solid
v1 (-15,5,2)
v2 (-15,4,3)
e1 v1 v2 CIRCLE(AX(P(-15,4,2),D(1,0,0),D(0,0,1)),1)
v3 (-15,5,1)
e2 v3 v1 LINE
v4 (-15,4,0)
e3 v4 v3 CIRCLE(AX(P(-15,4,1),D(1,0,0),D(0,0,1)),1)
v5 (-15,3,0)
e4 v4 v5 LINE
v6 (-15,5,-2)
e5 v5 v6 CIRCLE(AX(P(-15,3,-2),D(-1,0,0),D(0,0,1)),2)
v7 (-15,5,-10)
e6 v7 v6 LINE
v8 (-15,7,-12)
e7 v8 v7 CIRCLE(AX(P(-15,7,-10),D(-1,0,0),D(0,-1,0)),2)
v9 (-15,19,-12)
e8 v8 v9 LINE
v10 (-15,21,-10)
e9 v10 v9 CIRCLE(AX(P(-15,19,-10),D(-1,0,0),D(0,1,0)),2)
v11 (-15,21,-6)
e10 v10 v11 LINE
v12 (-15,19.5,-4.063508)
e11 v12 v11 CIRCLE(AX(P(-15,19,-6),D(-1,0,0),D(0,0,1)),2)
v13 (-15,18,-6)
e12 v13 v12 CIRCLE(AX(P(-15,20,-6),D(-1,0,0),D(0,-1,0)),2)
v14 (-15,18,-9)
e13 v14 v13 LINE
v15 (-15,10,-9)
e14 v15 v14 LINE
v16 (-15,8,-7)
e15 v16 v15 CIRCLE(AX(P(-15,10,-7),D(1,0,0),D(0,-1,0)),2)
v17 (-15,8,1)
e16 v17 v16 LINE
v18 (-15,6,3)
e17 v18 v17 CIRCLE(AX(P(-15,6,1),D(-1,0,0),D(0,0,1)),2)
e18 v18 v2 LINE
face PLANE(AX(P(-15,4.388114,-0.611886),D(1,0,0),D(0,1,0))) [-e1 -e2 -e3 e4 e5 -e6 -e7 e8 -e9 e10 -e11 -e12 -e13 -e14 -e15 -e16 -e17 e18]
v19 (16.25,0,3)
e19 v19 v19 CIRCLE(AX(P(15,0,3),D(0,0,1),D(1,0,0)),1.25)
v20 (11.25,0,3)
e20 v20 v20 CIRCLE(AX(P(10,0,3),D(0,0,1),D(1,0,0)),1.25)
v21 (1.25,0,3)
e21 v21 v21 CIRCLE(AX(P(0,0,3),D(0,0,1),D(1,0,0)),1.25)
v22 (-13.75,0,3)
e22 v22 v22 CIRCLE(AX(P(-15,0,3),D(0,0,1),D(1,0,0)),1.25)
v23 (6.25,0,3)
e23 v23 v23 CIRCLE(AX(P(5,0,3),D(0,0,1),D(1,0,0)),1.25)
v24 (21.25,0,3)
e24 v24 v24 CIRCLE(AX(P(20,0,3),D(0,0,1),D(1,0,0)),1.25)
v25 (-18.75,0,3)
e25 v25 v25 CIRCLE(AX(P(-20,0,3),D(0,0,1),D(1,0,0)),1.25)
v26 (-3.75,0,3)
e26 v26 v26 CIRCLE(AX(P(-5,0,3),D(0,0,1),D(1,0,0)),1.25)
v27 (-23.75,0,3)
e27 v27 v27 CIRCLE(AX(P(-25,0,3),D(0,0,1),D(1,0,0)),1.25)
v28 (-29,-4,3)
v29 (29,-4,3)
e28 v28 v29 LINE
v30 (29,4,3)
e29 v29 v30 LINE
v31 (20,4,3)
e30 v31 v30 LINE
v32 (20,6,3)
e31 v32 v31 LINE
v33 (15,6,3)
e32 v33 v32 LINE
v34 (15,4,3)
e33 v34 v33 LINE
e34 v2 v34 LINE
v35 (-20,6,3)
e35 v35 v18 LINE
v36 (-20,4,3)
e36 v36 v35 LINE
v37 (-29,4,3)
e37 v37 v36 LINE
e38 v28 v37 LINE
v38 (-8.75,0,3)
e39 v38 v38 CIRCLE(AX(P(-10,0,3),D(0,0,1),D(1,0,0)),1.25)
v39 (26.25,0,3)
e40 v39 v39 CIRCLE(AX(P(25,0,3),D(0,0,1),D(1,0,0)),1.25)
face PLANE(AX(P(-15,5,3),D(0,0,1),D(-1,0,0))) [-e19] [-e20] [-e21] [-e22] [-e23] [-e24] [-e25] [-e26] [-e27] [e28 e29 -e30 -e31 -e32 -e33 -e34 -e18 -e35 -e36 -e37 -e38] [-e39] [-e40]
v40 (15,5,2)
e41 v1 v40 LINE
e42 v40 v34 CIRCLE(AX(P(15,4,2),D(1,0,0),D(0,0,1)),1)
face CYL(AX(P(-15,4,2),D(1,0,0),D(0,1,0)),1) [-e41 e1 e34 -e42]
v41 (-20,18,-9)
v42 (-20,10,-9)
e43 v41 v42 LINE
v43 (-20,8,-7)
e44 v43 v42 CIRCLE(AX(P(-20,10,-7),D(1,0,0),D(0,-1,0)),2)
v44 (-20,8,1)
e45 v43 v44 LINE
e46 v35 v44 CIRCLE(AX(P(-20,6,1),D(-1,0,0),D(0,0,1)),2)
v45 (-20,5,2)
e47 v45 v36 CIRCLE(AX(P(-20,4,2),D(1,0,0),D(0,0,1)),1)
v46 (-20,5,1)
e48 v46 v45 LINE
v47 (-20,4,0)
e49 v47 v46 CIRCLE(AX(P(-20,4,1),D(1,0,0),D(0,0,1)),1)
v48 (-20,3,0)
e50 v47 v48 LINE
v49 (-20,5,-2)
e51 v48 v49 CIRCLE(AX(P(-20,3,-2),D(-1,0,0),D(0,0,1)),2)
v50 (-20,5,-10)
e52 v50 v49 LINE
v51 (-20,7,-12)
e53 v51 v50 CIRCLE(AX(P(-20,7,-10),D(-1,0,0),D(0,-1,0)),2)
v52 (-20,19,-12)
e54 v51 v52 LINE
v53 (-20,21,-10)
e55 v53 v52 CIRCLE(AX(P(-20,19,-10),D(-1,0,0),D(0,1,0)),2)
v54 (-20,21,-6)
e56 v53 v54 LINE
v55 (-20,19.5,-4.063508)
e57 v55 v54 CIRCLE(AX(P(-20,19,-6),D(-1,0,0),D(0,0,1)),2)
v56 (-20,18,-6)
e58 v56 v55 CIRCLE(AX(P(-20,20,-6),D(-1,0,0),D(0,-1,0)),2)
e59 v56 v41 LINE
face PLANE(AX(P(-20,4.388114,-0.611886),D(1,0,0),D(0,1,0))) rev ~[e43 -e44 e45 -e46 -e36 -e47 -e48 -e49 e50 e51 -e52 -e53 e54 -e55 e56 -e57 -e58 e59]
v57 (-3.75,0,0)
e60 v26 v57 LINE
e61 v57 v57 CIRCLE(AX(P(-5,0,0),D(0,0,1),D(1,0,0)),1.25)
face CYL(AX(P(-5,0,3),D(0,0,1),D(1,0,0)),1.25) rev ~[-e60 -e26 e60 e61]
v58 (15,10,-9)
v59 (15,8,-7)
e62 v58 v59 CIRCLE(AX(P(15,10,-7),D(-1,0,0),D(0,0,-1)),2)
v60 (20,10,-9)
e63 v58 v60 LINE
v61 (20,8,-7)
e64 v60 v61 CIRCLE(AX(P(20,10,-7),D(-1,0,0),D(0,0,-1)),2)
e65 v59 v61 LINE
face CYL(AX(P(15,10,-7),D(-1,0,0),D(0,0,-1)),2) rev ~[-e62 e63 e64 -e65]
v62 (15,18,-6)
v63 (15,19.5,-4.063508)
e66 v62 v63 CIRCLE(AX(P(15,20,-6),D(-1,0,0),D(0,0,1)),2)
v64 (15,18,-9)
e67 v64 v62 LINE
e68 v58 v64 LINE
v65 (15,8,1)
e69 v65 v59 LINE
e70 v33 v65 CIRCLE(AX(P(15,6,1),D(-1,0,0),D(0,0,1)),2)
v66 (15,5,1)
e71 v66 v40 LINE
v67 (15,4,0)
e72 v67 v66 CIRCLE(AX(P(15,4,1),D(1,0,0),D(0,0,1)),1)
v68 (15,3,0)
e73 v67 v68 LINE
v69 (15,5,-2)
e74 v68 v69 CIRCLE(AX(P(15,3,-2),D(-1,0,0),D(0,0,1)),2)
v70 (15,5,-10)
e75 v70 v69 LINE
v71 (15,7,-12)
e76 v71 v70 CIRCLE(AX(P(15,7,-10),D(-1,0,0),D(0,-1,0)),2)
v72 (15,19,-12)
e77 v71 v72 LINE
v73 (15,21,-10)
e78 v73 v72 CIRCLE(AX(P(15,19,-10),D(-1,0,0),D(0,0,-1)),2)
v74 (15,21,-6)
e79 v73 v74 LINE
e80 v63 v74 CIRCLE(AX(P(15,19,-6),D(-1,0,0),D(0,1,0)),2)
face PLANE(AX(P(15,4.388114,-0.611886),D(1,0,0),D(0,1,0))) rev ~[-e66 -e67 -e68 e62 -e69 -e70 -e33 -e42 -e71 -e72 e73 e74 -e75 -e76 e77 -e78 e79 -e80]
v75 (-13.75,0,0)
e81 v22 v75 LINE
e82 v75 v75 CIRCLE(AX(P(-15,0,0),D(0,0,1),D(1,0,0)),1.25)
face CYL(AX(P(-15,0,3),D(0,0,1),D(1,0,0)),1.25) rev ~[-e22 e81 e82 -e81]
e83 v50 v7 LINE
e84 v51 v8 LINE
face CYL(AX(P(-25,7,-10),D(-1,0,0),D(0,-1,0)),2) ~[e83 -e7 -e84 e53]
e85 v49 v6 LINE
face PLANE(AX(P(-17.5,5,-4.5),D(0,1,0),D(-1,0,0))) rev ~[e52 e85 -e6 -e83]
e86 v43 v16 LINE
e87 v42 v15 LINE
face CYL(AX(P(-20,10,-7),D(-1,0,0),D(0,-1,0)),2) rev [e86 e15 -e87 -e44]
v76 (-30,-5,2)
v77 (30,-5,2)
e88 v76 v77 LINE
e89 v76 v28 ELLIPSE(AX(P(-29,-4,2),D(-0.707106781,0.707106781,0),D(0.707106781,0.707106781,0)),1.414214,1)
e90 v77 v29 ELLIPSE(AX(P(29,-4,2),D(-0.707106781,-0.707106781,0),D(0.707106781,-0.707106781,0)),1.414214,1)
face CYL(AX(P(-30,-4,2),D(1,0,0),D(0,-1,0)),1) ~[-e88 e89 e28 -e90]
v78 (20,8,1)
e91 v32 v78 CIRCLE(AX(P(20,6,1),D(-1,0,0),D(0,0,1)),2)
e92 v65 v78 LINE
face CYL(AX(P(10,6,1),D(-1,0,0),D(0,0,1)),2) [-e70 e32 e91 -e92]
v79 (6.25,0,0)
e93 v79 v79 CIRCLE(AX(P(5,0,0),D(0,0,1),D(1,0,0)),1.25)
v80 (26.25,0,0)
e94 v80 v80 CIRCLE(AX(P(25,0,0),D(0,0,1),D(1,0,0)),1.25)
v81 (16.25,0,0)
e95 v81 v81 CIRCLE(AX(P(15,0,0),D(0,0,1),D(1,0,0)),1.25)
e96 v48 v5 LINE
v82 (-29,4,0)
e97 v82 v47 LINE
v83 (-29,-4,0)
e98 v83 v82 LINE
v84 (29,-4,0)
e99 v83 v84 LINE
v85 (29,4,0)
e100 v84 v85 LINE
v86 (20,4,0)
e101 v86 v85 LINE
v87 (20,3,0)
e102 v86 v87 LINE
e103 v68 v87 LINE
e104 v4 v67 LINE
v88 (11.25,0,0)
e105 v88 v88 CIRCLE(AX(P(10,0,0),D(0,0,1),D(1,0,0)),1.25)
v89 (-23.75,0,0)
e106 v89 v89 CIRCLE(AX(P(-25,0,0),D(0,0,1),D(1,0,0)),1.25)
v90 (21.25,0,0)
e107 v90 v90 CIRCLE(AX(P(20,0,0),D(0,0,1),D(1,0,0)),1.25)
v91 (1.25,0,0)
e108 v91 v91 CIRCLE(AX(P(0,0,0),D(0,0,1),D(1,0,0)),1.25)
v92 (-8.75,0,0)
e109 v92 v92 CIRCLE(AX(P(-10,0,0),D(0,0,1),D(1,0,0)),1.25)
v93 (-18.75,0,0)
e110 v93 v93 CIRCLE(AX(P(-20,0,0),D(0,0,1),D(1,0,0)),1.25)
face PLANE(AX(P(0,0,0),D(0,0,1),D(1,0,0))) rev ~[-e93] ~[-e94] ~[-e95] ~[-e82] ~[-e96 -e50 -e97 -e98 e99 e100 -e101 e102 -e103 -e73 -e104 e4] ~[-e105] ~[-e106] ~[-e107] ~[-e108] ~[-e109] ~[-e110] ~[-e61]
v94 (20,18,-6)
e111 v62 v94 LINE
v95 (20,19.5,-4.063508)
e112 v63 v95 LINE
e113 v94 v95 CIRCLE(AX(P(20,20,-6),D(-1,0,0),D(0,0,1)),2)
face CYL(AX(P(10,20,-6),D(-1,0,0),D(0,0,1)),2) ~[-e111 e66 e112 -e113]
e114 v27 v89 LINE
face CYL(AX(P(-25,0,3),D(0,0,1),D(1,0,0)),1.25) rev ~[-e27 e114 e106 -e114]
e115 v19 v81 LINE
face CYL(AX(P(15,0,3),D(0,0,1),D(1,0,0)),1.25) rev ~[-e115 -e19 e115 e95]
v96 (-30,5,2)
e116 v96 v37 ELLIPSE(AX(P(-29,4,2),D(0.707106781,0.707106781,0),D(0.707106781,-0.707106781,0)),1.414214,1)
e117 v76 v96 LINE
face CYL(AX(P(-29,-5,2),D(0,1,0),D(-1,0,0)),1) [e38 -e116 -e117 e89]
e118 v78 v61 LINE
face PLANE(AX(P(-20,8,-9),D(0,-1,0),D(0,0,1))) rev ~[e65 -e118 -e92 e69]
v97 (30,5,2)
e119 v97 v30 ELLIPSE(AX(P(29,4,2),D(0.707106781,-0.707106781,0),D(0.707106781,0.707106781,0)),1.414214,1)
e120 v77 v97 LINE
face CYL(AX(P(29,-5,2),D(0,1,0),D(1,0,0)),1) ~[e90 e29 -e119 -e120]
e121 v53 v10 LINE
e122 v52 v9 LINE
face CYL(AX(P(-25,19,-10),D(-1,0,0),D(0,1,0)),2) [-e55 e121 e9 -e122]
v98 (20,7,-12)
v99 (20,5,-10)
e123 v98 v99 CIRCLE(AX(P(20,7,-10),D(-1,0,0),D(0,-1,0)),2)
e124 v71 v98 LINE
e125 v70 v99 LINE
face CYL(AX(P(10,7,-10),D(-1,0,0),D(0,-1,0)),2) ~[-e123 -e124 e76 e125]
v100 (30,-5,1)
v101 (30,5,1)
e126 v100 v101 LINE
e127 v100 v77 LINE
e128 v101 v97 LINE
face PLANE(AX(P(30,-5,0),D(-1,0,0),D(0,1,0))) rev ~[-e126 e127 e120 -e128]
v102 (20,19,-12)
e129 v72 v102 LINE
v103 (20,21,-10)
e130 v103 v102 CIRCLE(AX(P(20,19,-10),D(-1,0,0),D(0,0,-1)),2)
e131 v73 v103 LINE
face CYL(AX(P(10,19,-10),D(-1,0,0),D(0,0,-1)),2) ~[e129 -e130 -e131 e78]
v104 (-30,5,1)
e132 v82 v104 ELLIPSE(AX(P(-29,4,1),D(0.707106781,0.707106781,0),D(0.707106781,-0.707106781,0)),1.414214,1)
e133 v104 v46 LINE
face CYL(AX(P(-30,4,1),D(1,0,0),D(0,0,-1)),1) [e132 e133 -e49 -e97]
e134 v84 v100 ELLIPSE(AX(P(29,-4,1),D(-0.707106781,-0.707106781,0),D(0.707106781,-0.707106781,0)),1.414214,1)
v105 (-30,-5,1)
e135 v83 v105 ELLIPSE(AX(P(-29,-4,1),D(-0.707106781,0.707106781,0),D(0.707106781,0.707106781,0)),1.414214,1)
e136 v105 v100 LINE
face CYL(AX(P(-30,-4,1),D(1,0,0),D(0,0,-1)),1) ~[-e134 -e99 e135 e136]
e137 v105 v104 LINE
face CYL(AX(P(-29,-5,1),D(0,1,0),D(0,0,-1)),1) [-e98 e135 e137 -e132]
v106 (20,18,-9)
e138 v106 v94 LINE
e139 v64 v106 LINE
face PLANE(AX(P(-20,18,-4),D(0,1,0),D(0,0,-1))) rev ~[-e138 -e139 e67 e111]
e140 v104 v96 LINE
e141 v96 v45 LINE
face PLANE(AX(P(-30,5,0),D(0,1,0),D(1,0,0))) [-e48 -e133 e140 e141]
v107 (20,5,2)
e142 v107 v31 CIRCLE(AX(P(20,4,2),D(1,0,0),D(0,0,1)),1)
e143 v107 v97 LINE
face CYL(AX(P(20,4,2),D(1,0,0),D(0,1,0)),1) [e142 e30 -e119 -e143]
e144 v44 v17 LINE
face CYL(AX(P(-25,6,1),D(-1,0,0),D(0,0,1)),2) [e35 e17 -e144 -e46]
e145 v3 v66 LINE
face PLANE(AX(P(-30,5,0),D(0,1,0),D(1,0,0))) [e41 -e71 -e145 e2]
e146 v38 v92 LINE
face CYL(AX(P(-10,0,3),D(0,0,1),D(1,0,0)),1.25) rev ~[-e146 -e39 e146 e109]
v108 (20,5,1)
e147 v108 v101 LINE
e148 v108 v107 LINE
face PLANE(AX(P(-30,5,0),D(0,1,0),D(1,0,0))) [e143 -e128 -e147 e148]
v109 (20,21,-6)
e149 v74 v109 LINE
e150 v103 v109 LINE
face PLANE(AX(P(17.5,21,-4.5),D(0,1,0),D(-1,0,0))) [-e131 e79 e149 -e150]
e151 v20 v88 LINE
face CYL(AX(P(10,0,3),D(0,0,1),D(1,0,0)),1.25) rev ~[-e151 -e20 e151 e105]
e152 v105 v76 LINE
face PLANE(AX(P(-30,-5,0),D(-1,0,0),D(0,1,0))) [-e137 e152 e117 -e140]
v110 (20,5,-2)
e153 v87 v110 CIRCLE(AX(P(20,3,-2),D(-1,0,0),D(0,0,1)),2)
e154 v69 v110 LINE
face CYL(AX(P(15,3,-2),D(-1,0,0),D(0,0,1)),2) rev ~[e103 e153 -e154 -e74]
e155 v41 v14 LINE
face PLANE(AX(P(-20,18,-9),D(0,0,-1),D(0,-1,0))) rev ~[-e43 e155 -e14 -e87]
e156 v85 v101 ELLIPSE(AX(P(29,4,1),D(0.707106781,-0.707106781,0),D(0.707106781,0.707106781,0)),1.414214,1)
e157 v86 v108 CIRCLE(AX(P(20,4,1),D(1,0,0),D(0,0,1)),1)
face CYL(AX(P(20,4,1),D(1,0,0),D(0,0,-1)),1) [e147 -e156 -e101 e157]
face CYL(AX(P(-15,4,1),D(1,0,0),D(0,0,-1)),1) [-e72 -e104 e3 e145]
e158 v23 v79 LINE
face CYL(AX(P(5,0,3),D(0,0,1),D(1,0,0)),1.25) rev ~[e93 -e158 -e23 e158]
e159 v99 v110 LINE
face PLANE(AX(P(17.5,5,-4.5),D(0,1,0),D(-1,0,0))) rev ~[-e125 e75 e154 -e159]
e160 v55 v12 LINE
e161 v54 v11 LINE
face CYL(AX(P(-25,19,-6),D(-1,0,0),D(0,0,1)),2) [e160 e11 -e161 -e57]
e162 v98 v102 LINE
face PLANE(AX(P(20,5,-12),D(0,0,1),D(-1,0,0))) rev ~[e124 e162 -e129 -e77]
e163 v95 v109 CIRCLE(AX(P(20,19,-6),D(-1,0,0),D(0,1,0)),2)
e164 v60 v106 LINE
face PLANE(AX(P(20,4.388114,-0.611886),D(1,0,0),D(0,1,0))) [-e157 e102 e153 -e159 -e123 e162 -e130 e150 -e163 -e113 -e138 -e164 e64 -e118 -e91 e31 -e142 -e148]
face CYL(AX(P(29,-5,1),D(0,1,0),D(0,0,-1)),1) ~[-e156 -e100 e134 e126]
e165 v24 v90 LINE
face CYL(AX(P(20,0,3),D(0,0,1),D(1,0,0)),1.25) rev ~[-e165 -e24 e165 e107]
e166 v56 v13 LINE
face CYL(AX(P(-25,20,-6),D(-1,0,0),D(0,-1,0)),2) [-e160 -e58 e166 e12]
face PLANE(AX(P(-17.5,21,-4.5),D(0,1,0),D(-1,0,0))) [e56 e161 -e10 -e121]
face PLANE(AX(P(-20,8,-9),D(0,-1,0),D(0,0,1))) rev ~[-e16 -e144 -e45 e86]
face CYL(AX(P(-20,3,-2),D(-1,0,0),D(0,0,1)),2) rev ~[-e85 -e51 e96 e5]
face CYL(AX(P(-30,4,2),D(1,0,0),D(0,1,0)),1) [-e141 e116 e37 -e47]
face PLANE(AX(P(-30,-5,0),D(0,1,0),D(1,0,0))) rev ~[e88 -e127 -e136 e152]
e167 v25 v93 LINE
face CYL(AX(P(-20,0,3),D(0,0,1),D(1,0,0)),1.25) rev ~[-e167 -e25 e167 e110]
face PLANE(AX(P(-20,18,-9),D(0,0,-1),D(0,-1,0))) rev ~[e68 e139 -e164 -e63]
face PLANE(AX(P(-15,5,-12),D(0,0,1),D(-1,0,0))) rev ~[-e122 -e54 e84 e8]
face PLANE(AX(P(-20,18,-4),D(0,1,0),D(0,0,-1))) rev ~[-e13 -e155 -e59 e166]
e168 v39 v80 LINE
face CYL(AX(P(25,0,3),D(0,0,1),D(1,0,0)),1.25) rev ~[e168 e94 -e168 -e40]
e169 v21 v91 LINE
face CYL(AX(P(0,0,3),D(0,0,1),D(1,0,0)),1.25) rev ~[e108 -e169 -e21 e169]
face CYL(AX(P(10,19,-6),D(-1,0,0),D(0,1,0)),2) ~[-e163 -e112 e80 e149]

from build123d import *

# Parameters (mm, degrees)
F0_W        = 60
F0_H        = 10
F1_DEPTH    = 3
F2_R        = 1.25
F3_DEPTH    = 3
F4_W        = 5
F4_H        = 15
F5_DEPTH    = 16
F7_DEPTH    = 60
F8_T1_DEPTH = 5
F8_T3_DEPTH = 5
F8_T5_DEPTH = 15
F8_T7_DEPTH = 15
F9_R        = 1


# Not quite as in the source:
# - a fillet or chamfer that OpenCascade refuses, or shapes differently, is made with other operations: its cross-section is extruded or revolved along the edge and cut away or added


with BuildPart() as f1:
    # F0 (on Top) → F1 (new body)
    with BuildSketch(Plane.XY):
        Rectangle(F0_W, F0_H)
    extrude(amount=F1_DEPTH)

    # F2 (on face) → F3 (cut)
    with BuildSketch(Plane.XY.offset(3)):
        with Locations((-25, 0)):
            Circle(F2_R)
        with Locations((-20, 0)):
            Circle(F2_R)
        with Locations((-15, 0)):
            Circle(F2_R)
        with Locations((-10, 0)):
            Circle(F2_R)
        with Locations((-5, 0)):
            Circle(F2_R)
        Circle(F2_R)
        with Locations((5, 0)):
            Circle(F2_R)
        with Locations((10, 0)):
            Circle(F2_R)
        with Locations((15, 0)):
            Circle(F2_R)
        with Locations((20, 0)):
            Circle(F2_R)
        with Locations((25, 0)):
            Circle(F2_R)
    extrude(amount=-F3_DEPTH, mode=Mode.SUBTRACT)

    # F4 (on face) → F5 (join)
    with BuildSketch(Plane(origin=(0, 5, 0), x_dir=(-1, 0, 0), z_dir=(0, 1, 0))):
        with Locations((17.5, -4.5)):
            Rectangle(F4_W, F4_H)
        with Locations((-17.5, -4.5)):
            Rectangle(F4_W, F4_H)
    extrude(amount=F5_DEPTH)

    # F6 (on face) → F7 (cut)
    with BuildSketch(Plane(origin=(-20, 0, 0), x_dir=(0, -1, 0), z_dir=(-1, 0, 0))):
        Polygon((-8, -9), (-8, 3), (-21, 3), (-21, -4), (-18, -4), (-18, -9), align=None)
    extrude(amount=-F7_DEPTH, mode=Mode.SUBTRACT)

    # F8: fillet of radius 2 on 17 edges, made by hand

    # F8_s2 → F8_t1 (join)
    with BuildSketch(Plane.YZ.offset(15)):
        with BuildLine():
            ThreePointArc((3, 0), (4.4142135624, -0.5857864376), (5, -2))
            Line((5, -2), (5, 0))
            Line((5, 0), (3, 0))
        make_face()
        with BuildLine():
            ThreePointArc((10, -9), (8.5857864376, -8.4142135624), (8, -7))
            Line((8, -7), (8, -9))
            Line((8, -9), (10, -9))
        make_face()
    extrude(amount=F8_T1_DEPTH)

    # F8_s4 → F8_t3 (join)
    with BuildSketch(Plane.YZ.offset(-20)):
        with BuildLine():
            ThreePointArc((3, 0), (4.4142135624, -0.5857864376), (5, -2))
            Line((5, -2), (5, 0))
            Line((5, 0), (3, 0))
        make_face()
        with BuildLine():
            ThreePointArc((8, -7), (8.5857864376, -8.4142135624), (10, -9))
            Line((10, -9), (8, -9))
            Line((8, -9), (8, -7))
        make_face()
    extrude(amount=F8_T3_DEPTH)

    # F8_s6 → F8_t5 (cut)
    with BuildSketch(Plane.YZ.offset(-25)):
        with BuildLine():
            ThreePointArc((5, -10), (5.5857864376, -11.4142135624), (7, -12))
            Line((7, -12), (5, -12))
            Line((5, -12), (5, -10))
        make_face()
        with BuildLine():
            ThreePointArc((21, -10), (20.4142135624, -11.4142135624), (19, -12))
            Line((19, -12), (21, -12))
            Line((21, -12), (21, -10))
        make_face()
        with BuildLine():
            ThreePointArc((19, -4), (20.4142135624, -4.5857864376), (21, -6))
            Line((21, -6), (21, -4))
            Line((21, -4), (19, -4))
        make_face()
        with BuildLine():
            ThreePointArc((18, -6), (18.5857864376, -4.5857864376), (20, -4))
            Line((20, -4), (18, -4))
            Line((18, -4), (18, -6))
        make_face()
        with BuildLine():
            ThreePointArc((6, 3), (7.4142135624, 2.4142135624), (8, 1))
            Line((8, 1), (8, 3))
            Line((8, 3), (6, 3))
        make_face()
    extrude(amount=F8_T5_DEPTH, mode=Mode.SUBTRACT)

    # F8_s8 → F8_t7 (cut)
    with BuildSketch(Plane.YZ.offset(10)):
        with BuildLine():
            ThreePointArc((5, -10), (5.5857864376, -11.4142135624), (7, -12))
            Line((7, -12), (5, -12))
            Line((5, -12), (5, -10))
        make_face()
        with BuildLine():
            ThreePointArc((19, -12), (20.4142135624, -11.4142135624), (21, -10))
            Line((21, -10), (21, -12))
            Line((21, -12), (19, -12))
        make_face()
        with BuildLine():
            ThreePointArc((21, -6), (20.4142135624, -4.5857864376), (19, -4))
            Line((19, -4), (21, -4))
            Line((21, -4), (21, -6))
        make_face()
        with BuildLine():
            ThreePointArc((20, -4), (18.5857864376, -4.5857864376), (18, -6))
            Line((18, -6), (18, -4))
            Line((18, -4), (20, -4))
        make_face()
        with BuildLine():
            ThreePointArc((6, 3), (7.4142135624, 2.4142135624), (8, 1))
            Line((8, 1), (8, 3))
            Line((8, 3), (6, 3))
        make_face()
    extrude(amount=F8_T7_DEPTH, mode=Mode.SUBTRACT)

    # F9
    f9_edges = [f1.edges().sort_by_distance(p)[0] for p in [
        (0, -5, 3),
        (30, 0, 3),
        (25, 5, 3),
        (0, 5, 3),
        (-25, 5, 3),
        (-30, 0, 3),
        (0, -5, 0),
        (30, 0, 0),
        (25, 5, 0),
        (0, 5, 0),
        (-25, 5, 0),
        (-30, 0, 0),
    ]]
    fillet(f9_edges, radius=F9_R)


solid = f1.part
